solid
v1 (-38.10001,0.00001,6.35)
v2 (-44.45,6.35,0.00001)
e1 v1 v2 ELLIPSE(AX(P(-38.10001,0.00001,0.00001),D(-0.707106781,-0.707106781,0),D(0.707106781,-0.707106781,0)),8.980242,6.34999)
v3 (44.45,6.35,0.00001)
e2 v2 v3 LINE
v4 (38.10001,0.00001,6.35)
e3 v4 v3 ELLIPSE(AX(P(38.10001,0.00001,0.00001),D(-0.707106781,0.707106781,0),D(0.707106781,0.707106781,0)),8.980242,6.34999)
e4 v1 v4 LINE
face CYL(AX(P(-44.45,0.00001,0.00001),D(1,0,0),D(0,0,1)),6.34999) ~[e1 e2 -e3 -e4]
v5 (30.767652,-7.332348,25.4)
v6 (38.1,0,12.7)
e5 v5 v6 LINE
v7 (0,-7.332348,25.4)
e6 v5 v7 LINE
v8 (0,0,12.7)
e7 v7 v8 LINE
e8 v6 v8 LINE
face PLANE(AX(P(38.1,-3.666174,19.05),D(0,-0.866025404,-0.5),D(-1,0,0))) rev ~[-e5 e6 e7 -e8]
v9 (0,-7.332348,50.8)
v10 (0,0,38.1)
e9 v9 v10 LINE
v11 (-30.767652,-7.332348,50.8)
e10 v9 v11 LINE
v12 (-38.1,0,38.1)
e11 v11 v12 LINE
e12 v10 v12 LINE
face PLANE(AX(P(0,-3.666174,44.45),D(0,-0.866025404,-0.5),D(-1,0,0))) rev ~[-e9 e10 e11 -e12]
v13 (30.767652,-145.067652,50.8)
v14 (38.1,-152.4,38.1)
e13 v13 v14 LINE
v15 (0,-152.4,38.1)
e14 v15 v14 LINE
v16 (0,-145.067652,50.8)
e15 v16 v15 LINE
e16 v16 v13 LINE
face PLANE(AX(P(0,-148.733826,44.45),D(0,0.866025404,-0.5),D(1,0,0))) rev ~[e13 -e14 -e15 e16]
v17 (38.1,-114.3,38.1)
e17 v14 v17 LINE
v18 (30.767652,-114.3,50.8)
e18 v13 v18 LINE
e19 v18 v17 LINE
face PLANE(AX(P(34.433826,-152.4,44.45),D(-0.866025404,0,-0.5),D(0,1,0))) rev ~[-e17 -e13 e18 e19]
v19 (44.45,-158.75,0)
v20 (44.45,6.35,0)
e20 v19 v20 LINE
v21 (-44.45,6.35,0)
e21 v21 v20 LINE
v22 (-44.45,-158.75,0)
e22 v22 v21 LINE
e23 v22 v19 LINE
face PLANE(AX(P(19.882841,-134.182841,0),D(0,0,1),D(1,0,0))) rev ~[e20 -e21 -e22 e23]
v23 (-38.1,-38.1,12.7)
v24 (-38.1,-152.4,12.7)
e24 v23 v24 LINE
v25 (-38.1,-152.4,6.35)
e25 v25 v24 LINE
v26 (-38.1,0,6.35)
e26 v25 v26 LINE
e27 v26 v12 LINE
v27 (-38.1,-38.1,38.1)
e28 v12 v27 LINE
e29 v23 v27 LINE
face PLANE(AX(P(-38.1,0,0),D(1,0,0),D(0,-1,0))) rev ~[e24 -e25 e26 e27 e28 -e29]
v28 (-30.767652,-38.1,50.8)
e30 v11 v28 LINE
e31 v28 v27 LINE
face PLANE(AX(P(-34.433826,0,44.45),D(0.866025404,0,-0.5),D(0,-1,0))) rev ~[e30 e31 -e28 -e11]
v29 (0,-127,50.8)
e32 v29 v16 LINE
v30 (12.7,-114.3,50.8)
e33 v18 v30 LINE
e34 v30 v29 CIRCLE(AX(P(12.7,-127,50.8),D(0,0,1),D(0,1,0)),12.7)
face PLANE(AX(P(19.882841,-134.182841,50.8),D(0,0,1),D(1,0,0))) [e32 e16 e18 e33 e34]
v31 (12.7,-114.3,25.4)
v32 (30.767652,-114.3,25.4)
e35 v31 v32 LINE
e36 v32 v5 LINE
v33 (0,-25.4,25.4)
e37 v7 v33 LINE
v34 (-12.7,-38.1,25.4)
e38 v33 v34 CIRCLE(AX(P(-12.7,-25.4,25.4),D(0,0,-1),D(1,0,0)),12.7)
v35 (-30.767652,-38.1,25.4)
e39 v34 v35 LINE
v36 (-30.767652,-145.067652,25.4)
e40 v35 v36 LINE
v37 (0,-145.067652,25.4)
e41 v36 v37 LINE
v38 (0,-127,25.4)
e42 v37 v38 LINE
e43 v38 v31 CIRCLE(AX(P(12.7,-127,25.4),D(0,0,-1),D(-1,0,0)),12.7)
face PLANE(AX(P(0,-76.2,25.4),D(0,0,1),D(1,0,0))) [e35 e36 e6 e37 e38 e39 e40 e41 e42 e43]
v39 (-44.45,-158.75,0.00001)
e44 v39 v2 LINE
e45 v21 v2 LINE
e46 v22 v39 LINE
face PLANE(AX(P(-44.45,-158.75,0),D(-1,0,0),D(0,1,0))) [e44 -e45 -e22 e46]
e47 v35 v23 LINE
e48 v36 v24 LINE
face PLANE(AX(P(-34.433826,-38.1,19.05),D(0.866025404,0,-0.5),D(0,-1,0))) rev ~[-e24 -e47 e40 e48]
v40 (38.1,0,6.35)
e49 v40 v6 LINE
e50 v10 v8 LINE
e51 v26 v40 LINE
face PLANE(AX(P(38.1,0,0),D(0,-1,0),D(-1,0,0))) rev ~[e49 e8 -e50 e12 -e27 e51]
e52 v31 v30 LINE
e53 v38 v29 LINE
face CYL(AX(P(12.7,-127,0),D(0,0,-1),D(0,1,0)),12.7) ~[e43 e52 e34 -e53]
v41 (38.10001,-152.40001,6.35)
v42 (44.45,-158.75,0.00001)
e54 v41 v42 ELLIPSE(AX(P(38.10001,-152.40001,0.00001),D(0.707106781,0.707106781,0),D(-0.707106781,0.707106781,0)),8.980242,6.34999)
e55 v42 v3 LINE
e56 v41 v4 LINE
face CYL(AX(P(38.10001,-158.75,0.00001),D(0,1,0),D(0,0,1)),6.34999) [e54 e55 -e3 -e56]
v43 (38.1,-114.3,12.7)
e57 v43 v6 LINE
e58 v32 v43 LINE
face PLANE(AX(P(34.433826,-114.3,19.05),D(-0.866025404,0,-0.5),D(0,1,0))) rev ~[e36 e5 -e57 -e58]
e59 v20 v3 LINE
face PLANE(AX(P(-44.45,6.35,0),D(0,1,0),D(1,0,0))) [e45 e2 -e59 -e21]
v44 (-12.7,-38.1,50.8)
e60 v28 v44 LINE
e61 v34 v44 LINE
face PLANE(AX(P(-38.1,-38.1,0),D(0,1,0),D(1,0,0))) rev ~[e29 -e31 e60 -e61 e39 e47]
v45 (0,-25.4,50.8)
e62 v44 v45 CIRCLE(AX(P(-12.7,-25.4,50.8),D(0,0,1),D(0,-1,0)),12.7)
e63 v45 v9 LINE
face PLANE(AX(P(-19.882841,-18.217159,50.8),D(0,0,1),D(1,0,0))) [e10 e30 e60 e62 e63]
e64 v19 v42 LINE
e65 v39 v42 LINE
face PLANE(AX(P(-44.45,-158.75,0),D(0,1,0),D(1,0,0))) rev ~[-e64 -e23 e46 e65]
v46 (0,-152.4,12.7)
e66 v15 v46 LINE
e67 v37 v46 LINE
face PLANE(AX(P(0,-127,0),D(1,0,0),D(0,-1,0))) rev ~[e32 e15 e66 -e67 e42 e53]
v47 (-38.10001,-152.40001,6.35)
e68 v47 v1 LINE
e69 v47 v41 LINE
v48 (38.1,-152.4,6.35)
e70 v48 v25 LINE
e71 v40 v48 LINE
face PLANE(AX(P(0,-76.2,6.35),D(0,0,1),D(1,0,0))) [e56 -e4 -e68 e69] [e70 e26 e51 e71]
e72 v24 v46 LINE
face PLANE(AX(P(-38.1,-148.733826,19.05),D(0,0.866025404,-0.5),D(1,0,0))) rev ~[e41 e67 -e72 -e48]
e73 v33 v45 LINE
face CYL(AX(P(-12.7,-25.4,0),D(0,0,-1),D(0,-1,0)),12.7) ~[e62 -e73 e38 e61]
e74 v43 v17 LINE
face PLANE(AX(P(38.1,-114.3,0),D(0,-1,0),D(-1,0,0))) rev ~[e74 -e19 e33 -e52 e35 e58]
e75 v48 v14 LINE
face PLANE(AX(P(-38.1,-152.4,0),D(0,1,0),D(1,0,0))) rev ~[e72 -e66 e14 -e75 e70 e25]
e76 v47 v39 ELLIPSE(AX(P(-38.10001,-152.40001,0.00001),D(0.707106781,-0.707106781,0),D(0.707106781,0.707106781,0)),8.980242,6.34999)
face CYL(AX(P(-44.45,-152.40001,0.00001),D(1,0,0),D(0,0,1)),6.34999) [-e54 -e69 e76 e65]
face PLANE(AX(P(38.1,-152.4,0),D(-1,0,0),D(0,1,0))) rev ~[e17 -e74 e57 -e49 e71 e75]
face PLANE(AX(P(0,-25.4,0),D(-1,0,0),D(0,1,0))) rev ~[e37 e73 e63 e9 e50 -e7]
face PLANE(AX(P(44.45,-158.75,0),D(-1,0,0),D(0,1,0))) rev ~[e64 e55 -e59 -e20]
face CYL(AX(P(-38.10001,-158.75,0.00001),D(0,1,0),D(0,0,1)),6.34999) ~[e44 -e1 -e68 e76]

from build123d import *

# Parameters (mm, degrees)
F0_W       = 88.9
F0_H       = 165.1
F1_DEPTH   = 6.35
F2_DEPTH   = 25.4
F3_DEPTH   = 50.8
F4_SIZE2   = 12.7
F4_SIZE    = 7.3323484187
F4_2_SIZE2 = 12.7
F4_2_SIZE  = 7.3323484187
F4_3_SIZE2 = 12.7
F4_3_SIZE  = 7.3323484187
F5_R       = 6.34999


# Not quite as in the source:
# - a fillet or chamfer is up to 0.001 mm smaller than in the source, because OpenCascade refuses the exact size


with BuildPart() as f1:
    # F0 (on Top) → F1 (new body)
    with BuildSketch(Plane.XY):
        with Locations((0, -76.2)):
            Rectangle(F0_W, F0_H)
        Polygon((-38.1, -38.1), (-38.1, 0), (0, 0), (38.1, 0), (38.1, -114.3), (38.1, -152.4), (0, -152.4), (-38.1, -152.4), align=None, mode=Mode.SUBTRACT)
        with BuildLine():
            Line((-12.7, -38.1), (-38.1, -38.1))
            Line((-38.1, -38.1), (-38.1, -152.4))
            Line((-38.1, -152.4), (0, -152.4))
            Line((0, -152.4), (0, -127))
            ThreePointArc((0, -127), (3.7197438789, -118.0197438789), (12.7, -114.3))
            Line((12.7, -114.3), (38.1, -114.3))
            Line((38.1, -114.3), (38.1, 0))
            Line((38.1, 0), (0, 0))
            Line((0, 0), (0, -25.4))
            ThreePointArc((0, -25.4), (-3.7197438789, -34.3802561211), (-12.7, -38.1))
        make_face()
        with BuildLine():
            Line((0, 0), (-38.1, 0))
            Line((-38.1, 0), (-38.1, -38.1))
            Line((-38.1, -38.1), (-12.7, -38.1))
            ThreePointArc((-12.7, -38.1), (-3.7197438789, -34.3802561211), (0, -25.4))
            Line((0, -25.4), (0, 0))
        make_face()
        with BuildLine():
            Line((0, -127), (0, -152.4))
            Line((0, -152.4), (38.1, -152.4))
            Line((38.1, -152.4), (38.1, -114.3))
            Line((38.1, -114.3), (12.7, -114.3))
            ThreePointArc((12.7, -114.3), (3.7197438789, -118.0197438789), (0, -127))
        make_face()
    extrude(amount=F1_DEPTH)

    # F0 (on Top) → F2 (join)
    with BuildSketch(Plane.XY):
        with BuildLine():
            Line((-12.7, -38.1), (-38.1, -38.1))
            Line((-38.1, -38.1), (-38.1, -152.4))
            Line((-38.1, -152.4), (0, -152.4))
            Line((0, -152.4), (0, -127))
            ThreePointArc((0, -127), (3.7197438789, -118.0197438789), (12.7, -114.3))
            Line((12.7, -114.3), (38.1, -114.3))
            Line((38.1, -114.3), (38.1, 0))
            Line((38.1, 0), (0, 0))
            Line((0, 0), (0, -25.4))
            ThreePointArc((0, -25.4), (-3.7197438789, -34.3802561211), (-12.7, -38.1))
        make_face()
    extrude(amount=F2_DEPTH)

    # F0 (on Top) → F3 (join)
    with BuildSketch(Plane.XY):
        with BuildLine():
            Line((0, -127), (0, -152.4))
            Line((0, -152.4), (38.1, -152.4))
            Line((38.1, -152.4), (38.1, -114.3))
            Line((38.1, -114.3), (12.7, -114.3))
            ThreePointArc((12.7, -114.3), (3.7197438789, -118.0197438789), (0, -127))
        make_face()
        with BuildLine():
            Line((0, 0), (-38.1, 0))
            Line((-38.1, 0), (-38.1, -38.1))
            Line((-38.1, -38.1), (-12.7, -38.1))
            ThreePointArc((-12.7, -38.1), (-3.7197438789, -34.3802561211), (0, -25.4))
            Line((0, -25.4), (0, 0))
        make_face()
    extrude(amount=F3_DEPTH)

    # F4
    f4_edges = [f1.edges().sort_by_distance(p)[0] for p in [
        (-38.1, -95.25, 25.4),
        (-19.05, -152.4, 25.4),
        (38.1, -57.15, 25.4),
        (19.05, 0, 25.4),
    ]]
    f4_side = f1.faces().sort_by_distance((0, -76.2, 25.4))[0]
    chamfer(f4_edges, length=F4_SIZE, length2=F4_SIZE2, reference=f4_side)

    # F4#2
    f4_2_edges = [f1.edges().sort_by_distance(p)[0] for p in [
        (38.1, -133.35, 50.8),
        (19.05, -152.4, 50.8),
    ]]
    f4_2_side = f1.faces().sort_by_distance((19.446042, -133.746042, 50.8))[0]
    chamfer(f4_2_edges, length=F4_2_SIZE, length2=F4_2_SIZE2, reference=f4_2_side)

    # F4#3
    f4_3_edges = [f1.edges().sort_by_distance(p)[0] for p in [
        (-19.05, 0, 50.8),
        (-38.1, -19.05, 50.8),
    ]]
    f4_3_side = f1.faces().sort_by_distance((-19.446042, -18.653958, 50.8))[0]
    chamfer(f4_3_edges, length=F4_3_SIZE, length2=F4_3_SIZE2, reference=f4_3_side)

    # F5 (radius 6.35 in the source; OpenCascade refuses exactly that, so slightly less here)
    f5_edges = [f1.edges().sort_by_distance(p)[0] for p in [
        (44.45, -76.2, 6.35),
        (0, 6.35, 6.35),
        (-44.45, -76.2, 6.35),
        (0, -158.75, 6.35),
    ]]
    fillet(f5_edges, radius=F5_R)


solid = f1.part
